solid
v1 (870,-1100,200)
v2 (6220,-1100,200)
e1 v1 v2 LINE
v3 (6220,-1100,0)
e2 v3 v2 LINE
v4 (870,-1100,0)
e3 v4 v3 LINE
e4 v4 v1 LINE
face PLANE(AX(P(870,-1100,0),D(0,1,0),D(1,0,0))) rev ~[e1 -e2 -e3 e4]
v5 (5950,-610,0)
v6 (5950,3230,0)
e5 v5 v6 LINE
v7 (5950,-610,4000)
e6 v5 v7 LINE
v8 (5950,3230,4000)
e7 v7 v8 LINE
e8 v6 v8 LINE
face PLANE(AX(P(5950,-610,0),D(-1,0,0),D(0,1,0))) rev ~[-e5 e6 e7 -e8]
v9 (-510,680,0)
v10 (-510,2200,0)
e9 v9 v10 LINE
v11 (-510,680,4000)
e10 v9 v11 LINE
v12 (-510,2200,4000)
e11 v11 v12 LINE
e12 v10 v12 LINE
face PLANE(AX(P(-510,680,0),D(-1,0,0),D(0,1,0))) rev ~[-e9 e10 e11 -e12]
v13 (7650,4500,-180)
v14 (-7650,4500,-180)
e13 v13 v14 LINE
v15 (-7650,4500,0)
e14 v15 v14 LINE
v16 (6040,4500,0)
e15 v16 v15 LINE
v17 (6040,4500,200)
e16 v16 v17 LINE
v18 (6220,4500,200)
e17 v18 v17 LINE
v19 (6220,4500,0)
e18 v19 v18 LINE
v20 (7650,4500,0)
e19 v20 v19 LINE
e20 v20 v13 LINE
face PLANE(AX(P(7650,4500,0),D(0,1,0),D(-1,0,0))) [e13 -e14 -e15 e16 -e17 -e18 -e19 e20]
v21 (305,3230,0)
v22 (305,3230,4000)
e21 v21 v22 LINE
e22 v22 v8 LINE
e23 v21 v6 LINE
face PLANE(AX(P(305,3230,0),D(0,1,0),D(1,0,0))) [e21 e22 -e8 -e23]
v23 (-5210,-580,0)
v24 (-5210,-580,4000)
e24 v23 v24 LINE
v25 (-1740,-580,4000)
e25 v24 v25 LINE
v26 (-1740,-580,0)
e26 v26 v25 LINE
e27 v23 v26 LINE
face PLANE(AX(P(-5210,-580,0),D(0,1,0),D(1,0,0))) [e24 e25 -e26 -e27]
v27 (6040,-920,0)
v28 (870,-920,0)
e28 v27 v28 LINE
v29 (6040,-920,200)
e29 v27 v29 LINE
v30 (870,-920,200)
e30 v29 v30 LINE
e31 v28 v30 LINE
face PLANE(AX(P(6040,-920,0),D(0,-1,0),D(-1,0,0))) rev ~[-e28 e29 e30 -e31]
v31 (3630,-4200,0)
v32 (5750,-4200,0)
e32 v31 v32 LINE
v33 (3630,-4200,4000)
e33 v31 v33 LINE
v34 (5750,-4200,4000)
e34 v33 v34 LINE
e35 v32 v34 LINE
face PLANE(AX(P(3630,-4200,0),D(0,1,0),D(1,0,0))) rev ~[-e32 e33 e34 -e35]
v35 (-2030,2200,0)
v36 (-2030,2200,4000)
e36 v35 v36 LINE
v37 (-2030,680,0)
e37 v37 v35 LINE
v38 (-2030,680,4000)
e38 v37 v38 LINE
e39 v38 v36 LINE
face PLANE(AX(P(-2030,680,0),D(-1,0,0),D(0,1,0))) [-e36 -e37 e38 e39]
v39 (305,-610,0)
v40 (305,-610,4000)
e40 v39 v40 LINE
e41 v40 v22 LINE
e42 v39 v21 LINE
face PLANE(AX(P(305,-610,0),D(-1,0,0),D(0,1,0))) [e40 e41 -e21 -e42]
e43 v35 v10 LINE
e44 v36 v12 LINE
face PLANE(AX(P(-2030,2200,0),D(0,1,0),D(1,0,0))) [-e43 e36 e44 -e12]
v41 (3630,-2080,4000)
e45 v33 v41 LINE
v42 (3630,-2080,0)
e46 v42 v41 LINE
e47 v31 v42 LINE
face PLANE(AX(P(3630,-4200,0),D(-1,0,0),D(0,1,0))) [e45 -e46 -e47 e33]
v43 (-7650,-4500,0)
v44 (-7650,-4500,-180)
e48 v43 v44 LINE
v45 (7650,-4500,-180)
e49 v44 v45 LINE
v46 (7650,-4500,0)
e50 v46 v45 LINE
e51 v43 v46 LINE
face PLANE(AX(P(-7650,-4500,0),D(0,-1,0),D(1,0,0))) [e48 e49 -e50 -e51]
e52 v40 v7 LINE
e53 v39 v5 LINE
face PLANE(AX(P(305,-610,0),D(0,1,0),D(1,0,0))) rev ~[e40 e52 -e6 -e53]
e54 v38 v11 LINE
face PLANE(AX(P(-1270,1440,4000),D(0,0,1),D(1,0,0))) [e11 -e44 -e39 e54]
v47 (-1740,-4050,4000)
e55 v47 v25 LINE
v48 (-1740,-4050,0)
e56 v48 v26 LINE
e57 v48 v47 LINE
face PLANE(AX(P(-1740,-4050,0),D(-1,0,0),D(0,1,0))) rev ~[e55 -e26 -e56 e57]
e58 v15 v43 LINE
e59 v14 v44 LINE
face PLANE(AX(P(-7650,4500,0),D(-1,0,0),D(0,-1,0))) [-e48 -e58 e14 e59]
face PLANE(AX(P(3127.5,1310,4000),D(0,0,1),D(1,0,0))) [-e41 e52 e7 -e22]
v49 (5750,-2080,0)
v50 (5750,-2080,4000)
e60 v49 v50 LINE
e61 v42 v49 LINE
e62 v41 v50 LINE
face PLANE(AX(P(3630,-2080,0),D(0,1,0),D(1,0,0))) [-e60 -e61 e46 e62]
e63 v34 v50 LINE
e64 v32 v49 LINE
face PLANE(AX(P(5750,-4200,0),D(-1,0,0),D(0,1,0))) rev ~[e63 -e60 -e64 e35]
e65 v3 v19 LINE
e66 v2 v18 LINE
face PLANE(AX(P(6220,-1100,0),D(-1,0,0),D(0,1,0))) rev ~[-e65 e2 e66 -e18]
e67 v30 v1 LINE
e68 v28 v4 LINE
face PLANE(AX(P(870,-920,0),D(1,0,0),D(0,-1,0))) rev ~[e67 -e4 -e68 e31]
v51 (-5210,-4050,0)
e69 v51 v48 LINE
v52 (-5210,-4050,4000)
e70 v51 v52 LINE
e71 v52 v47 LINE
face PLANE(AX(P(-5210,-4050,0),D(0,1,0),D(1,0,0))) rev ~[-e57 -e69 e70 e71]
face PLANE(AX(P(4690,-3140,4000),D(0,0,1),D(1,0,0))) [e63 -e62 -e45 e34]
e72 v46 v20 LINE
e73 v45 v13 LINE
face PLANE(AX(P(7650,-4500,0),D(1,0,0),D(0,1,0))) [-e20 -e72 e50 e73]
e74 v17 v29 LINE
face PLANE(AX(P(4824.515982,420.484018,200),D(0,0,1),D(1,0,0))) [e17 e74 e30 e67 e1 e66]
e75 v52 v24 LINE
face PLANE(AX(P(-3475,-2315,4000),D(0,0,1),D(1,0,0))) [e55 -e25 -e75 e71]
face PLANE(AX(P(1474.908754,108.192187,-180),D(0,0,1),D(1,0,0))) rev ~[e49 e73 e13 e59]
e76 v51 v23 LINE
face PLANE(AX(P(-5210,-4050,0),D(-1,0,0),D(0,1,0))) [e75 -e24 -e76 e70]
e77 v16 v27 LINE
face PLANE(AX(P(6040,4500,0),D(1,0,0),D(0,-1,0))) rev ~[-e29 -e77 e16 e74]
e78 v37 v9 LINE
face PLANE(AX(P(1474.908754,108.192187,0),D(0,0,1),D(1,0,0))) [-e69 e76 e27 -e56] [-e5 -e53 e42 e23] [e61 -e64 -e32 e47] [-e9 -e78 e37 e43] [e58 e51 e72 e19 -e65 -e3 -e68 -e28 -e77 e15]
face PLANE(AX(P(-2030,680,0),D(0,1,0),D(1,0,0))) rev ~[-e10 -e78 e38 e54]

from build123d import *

# Parameters (mm, degrees)
F0_W     = 3470
F0_H     = 3470
F0_W_2   = 2120
F0_H_2   = 2120
F0_W_3   = 1520
F0_H_3   = 1520
F0_W_4   = 5645
F0_H_4   = 3840
F1_DEPTH = 180
F2_DEPTH = 4000
F3_DEPTH = 200


# Not quite as in the source:
# - a feature names something its author has since deleted; it is built from what else it names


with BuildPart() as f1:
    # F0 (on Top) → F1 (new body)
    with BuildSketch(Plane.XY):
        Polygon((-7650, 4500), (-7650, -4500), (7650, -4500), (7650, 4500), (6220, 4500), (6220, -1100), (870, -1100), (870, -920), (1050, -920), (6040, -920), (6040, 4500), align=None)
        with Locations((-3475, -2315)):
            Rectangle(F0_W, F0_H, mode=Mode.SUBTRACT)
        with Locations((4690, -3140)):
            Rectangle(F0_W_2, F0_H_2, mode=Mode.SUBTRACT)
        with Locations((-1270, 1440)):
            Rectangle(F0_W_3, F0_H_3, mode=Mode.SUBTRACT)
        with Locations((3127.5, 1310)):
            Rectangle(F0_W_4, F0_H_4, mode=Mode.SUBTRACT)
        Polygon((6220, 4500), (6040, 4500), (6040, -920), (1050, -920), (870, -920), (870, -1100), (6220, -1100), align=None)
        with Locations((-3475, -2315)):
            Rectangle(F0_W, F0_H)
        with Locations((-1270, 1440)):
            Rectangle(F0_W_3, F0_H_3)
        with Locations((4690, -3140)):
            Rectangle(F0_W_2, F0_H_2)
        with Locations((3127.5, 1310)):
            Rectangle(F0_W_4, F0_H_4)
    extrude(amount=-F1_DEPTH)

    # F0 (on Top) → F2 (join)
    with BuildSketch(Plane.XY):
        with Locations((-3475, -2315)):
            Rectangle(F0_W, F0_H)
        with Locations((-1270, 1440)):
            Rectangle(F0_W_3, F0_H_3)
        with Locations((4690, -3140)):
            Rectangle(F0_W_2, F0_H_2)
        with Locations((3127.5, 1310)):
            Rectangle(F0_W_4, F0_H_4)
    extrude(amount=F2_DEPTH)

    # F0 (on Top) → F3 (join)
    with BuildSketch(Plane.XY):
        Polygon((6220, 4500), (6040, 4500), (6040, -920), (1050, -920), (870, -920), (870, -1100), (6220, -1100), align=None)
    extrude(amount=F3_DEPTH)


solid = f1.part
